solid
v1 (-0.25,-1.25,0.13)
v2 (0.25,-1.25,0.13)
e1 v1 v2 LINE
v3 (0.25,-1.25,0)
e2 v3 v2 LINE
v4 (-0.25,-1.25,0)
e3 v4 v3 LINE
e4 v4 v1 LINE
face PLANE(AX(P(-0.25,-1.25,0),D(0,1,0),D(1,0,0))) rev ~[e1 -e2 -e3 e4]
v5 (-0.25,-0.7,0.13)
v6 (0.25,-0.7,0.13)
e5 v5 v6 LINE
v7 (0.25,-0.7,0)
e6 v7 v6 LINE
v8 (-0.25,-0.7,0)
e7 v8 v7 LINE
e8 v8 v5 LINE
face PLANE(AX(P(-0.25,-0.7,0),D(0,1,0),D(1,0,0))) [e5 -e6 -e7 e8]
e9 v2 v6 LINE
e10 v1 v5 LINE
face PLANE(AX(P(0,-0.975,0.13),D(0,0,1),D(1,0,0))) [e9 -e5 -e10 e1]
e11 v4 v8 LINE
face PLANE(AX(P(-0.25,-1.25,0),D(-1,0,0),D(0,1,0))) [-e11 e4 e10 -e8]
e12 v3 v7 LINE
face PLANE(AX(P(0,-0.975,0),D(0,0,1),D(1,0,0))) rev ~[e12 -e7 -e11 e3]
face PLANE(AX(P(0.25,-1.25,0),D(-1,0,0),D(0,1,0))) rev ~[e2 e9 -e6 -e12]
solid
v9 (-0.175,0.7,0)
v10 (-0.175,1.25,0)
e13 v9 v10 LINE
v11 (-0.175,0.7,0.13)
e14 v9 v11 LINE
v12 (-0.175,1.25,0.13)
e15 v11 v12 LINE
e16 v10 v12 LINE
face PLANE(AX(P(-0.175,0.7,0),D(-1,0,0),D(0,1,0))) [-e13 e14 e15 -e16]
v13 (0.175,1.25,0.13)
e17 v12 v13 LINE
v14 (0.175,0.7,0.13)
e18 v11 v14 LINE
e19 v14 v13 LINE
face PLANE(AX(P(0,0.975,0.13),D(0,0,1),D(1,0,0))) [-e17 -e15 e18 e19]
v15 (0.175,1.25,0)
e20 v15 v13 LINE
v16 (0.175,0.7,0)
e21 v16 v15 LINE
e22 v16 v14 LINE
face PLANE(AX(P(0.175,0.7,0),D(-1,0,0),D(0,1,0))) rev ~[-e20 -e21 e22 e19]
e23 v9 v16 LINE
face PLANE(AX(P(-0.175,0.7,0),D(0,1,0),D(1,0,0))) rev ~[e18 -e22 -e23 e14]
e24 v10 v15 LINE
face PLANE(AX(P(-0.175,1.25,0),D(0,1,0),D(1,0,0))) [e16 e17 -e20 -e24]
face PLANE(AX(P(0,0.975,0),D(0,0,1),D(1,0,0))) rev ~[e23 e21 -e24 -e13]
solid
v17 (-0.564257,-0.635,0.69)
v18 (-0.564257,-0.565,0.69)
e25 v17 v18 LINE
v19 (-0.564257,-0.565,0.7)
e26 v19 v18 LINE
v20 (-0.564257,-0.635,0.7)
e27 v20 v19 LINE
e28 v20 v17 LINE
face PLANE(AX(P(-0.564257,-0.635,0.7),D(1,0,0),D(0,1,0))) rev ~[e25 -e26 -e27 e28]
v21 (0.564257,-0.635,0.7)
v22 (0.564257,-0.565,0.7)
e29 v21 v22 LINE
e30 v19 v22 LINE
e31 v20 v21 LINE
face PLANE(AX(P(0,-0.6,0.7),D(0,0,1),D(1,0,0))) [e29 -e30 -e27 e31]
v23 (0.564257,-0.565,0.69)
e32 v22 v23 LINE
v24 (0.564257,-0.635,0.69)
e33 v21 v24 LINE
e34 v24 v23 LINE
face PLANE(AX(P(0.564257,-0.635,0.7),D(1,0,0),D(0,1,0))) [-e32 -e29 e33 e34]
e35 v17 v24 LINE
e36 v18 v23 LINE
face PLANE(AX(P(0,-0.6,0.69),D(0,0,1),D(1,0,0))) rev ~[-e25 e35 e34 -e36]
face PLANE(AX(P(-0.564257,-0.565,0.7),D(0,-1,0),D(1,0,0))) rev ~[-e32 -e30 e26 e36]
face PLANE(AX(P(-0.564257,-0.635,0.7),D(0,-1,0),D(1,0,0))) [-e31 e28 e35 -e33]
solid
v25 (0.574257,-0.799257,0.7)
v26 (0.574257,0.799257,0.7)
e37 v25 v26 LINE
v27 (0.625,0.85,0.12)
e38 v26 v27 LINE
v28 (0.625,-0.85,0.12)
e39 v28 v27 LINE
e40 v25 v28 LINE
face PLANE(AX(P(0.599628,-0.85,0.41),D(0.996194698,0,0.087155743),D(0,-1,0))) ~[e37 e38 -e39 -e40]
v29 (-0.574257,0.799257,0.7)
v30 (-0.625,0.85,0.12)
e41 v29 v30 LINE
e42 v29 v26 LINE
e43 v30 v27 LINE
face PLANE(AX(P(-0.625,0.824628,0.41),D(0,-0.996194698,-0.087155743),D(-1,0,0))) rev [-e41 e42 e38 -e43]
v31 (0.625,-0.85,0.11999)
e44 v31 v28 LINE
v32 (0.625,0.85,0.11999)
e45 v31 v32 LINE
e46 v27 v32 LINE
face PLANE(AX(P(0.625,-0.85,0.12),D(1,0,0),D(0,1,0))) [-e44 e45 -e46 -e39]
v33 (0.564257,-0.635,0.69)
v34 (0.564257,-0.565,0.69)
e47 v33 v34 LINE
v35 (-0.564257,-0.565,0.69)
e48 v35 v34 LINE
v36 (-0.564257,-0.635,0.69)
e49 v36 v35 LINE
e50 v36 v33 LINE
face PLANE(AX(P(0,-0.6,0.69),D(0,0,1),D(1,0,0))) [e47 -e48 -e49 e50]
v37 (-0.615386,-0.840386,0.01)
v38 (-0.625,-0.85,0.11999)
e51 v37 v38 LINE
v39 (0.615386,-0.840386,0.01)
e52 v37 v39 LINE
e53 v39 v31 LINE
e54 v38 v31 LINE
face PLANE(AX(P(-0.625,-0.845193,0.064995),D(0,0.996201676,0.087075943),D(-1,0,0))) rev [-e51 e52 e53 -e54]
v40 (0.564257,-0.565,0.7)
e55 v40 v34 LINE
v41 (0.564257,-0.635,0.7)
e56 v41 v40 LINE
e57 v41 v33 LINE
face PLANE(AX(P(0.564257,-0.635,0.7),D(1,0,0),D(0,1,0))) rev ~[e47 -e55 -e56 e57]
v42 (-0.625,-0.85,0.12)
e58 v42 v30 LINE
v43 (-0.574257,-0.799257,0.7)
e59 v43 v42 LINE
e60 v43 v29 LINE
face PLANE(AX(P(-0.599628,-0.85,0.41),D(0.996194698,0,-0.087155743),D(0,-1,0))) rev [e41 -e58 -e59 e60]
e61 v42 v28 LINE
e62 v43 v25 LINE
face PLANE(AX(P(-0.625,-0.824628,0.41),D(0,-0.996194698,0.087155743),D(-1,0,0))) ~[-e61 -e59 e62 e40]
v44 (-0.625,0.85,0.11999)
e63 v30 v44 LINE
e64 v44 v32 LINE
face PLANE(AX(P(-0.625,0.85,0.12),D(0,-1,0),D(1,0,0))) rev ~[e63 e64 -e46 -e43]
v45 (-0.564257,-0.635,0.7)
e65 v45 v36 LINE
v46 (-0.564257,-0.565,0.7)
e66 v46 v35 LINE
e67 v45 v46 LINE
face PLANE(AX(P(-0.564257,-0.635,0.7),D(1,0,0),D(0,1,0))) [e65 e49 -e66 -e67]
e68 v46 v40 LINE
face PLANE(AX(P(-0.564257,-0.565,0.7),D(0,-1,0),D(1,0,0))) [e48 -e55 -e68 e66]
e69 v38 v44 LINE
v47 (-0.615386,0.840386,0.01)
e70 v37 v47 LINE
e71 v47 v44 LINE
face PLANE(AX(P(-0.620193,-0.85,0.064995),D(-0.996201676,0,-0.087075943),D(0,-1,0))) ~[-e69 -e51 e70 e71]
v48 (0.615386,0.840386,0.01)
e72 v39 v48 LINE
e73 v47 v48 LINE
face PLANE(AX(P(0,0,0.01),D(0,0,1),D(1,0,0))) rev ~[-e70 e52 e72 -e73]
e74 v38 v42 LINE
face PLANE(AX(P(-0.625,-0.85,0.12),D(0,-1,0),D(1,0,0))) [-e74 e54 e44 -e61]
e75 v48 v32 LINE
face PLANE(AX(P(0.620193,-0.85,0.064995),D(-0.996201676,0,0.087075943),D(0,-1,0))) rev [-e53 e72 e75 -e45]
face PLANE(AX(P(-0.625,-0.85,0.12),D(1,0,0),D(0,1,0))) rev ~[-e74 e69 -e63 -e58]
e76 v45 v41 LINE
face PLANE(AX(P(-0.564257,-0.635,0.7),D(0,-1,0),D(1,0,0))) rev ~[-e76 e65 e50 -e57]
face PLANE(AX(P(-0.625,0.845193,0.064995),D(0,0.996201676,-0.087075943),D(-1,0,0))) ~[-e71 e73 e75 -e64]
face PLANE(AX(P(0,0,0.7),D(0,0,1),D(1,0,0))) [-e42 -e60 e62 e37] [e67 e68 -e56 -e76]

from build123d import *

# Parameters (mm, degrees)
F0_W          = 0.5
F0_H          = 0.55
F1_DEPTH      = 0.13
F0_W_2        = 0.35
F3_W          = 1.25
F3_H          = 1.7
F4_DEPTH      = 0.58
F4_DEPTH_BACK = 0.11
F5_SIZE2      = 0.58
F5_SIZE       = 0.0507434248
F6_SIZE2      = 0.10999
F6_SIZE       = 0.009614
F7_W          = 1.1285131503
F7_H          = 0.07
F8_DEPTH      = 0.01


# Not quite as in the source:
# - a fillet or chamfer is up to 0.001 mm smaller than in the source, because OpenCascade refuses the exact size


with BuildPart() as f1:
    # F0 (on Top) → F1 (new body)
    with BuildSketch(Plane.XY):
        with Locations((0, -0.975)):
            Rectangle(F0_W, F0_H)
    extrude(amount=F1_DEPTH)


with BuildPart() as f1b:
    # F0 (on Top) → F1, piece 2 (new body)
    with BuildSketch(Plane.XY):
        with Locations((0, 0.975)):
            Rectangle(F0_W_2, F0_H)
    extrude(amount=F1_DEPTH)


with BuildPart() as f4:
    # F3 (on offset) → F4 (new body, two sides)
    with BuildSketch(Plane.XY.offset(0.12)) as f4_sk:
        Rectangle(F3_W, F3_H)
    extrude(amount=F4_DEPTH)
    extrude(f4_sk.sketch, amount=-F4_DEPTH_BACK)

    # F5
    f5_edges = [f4.edges().sort_by_distance(p)[0] for p in [
        (0, -0.85, 0.7),
        (0.625, 0, 0.7),
        (0, 0.85, 0.7),
        (-0.625, 0, 0.7),
    ]]
    f5_side = f4.faces().sort_by_distance((0, 0, 0.7))[0]
    chamfer(f5_edges, length=F5_SIZE, length2=F5_SIZE2, reference=f5_side)

    # F6 (size 0.009623753 and 0.11 in the source; OpenCascade refuses exactly that, so slightly less here)
    f6_edges = [f4.edges().sort_by_distance(p)[0] for p in [
        (0.625, 0, 0.01),
        (0, 0.85, 0.01),
        (-0.625, 0, 0.01),
        (0, -0.85, 0.01),
    ]]
    f6_side = f4.faces().sort_by_distance((0, 0, 0.01))[0]
    chamfer(f6_edges, length=F6_SIZE, length2=F6_SIZE2, reference=f6_side)


with BuildPart() as f8:
    # F7 (on face) → F8 (new body)
    with BuildSketch(Plane.XY.offset(0.7)):
        with Locations((0, -0.6)):
            Rectangle(F7_W, F7_H)
    extrude(amount=-F8_DEPTH)


with BuildPart() as f4_1:
    add(f4.part)

    # F9: cut F8
    add(f8.part, mode=Mode.SUBTRACT)


solid = Compound([f1.part, f1b.part, f8.part, f4_1.part])
